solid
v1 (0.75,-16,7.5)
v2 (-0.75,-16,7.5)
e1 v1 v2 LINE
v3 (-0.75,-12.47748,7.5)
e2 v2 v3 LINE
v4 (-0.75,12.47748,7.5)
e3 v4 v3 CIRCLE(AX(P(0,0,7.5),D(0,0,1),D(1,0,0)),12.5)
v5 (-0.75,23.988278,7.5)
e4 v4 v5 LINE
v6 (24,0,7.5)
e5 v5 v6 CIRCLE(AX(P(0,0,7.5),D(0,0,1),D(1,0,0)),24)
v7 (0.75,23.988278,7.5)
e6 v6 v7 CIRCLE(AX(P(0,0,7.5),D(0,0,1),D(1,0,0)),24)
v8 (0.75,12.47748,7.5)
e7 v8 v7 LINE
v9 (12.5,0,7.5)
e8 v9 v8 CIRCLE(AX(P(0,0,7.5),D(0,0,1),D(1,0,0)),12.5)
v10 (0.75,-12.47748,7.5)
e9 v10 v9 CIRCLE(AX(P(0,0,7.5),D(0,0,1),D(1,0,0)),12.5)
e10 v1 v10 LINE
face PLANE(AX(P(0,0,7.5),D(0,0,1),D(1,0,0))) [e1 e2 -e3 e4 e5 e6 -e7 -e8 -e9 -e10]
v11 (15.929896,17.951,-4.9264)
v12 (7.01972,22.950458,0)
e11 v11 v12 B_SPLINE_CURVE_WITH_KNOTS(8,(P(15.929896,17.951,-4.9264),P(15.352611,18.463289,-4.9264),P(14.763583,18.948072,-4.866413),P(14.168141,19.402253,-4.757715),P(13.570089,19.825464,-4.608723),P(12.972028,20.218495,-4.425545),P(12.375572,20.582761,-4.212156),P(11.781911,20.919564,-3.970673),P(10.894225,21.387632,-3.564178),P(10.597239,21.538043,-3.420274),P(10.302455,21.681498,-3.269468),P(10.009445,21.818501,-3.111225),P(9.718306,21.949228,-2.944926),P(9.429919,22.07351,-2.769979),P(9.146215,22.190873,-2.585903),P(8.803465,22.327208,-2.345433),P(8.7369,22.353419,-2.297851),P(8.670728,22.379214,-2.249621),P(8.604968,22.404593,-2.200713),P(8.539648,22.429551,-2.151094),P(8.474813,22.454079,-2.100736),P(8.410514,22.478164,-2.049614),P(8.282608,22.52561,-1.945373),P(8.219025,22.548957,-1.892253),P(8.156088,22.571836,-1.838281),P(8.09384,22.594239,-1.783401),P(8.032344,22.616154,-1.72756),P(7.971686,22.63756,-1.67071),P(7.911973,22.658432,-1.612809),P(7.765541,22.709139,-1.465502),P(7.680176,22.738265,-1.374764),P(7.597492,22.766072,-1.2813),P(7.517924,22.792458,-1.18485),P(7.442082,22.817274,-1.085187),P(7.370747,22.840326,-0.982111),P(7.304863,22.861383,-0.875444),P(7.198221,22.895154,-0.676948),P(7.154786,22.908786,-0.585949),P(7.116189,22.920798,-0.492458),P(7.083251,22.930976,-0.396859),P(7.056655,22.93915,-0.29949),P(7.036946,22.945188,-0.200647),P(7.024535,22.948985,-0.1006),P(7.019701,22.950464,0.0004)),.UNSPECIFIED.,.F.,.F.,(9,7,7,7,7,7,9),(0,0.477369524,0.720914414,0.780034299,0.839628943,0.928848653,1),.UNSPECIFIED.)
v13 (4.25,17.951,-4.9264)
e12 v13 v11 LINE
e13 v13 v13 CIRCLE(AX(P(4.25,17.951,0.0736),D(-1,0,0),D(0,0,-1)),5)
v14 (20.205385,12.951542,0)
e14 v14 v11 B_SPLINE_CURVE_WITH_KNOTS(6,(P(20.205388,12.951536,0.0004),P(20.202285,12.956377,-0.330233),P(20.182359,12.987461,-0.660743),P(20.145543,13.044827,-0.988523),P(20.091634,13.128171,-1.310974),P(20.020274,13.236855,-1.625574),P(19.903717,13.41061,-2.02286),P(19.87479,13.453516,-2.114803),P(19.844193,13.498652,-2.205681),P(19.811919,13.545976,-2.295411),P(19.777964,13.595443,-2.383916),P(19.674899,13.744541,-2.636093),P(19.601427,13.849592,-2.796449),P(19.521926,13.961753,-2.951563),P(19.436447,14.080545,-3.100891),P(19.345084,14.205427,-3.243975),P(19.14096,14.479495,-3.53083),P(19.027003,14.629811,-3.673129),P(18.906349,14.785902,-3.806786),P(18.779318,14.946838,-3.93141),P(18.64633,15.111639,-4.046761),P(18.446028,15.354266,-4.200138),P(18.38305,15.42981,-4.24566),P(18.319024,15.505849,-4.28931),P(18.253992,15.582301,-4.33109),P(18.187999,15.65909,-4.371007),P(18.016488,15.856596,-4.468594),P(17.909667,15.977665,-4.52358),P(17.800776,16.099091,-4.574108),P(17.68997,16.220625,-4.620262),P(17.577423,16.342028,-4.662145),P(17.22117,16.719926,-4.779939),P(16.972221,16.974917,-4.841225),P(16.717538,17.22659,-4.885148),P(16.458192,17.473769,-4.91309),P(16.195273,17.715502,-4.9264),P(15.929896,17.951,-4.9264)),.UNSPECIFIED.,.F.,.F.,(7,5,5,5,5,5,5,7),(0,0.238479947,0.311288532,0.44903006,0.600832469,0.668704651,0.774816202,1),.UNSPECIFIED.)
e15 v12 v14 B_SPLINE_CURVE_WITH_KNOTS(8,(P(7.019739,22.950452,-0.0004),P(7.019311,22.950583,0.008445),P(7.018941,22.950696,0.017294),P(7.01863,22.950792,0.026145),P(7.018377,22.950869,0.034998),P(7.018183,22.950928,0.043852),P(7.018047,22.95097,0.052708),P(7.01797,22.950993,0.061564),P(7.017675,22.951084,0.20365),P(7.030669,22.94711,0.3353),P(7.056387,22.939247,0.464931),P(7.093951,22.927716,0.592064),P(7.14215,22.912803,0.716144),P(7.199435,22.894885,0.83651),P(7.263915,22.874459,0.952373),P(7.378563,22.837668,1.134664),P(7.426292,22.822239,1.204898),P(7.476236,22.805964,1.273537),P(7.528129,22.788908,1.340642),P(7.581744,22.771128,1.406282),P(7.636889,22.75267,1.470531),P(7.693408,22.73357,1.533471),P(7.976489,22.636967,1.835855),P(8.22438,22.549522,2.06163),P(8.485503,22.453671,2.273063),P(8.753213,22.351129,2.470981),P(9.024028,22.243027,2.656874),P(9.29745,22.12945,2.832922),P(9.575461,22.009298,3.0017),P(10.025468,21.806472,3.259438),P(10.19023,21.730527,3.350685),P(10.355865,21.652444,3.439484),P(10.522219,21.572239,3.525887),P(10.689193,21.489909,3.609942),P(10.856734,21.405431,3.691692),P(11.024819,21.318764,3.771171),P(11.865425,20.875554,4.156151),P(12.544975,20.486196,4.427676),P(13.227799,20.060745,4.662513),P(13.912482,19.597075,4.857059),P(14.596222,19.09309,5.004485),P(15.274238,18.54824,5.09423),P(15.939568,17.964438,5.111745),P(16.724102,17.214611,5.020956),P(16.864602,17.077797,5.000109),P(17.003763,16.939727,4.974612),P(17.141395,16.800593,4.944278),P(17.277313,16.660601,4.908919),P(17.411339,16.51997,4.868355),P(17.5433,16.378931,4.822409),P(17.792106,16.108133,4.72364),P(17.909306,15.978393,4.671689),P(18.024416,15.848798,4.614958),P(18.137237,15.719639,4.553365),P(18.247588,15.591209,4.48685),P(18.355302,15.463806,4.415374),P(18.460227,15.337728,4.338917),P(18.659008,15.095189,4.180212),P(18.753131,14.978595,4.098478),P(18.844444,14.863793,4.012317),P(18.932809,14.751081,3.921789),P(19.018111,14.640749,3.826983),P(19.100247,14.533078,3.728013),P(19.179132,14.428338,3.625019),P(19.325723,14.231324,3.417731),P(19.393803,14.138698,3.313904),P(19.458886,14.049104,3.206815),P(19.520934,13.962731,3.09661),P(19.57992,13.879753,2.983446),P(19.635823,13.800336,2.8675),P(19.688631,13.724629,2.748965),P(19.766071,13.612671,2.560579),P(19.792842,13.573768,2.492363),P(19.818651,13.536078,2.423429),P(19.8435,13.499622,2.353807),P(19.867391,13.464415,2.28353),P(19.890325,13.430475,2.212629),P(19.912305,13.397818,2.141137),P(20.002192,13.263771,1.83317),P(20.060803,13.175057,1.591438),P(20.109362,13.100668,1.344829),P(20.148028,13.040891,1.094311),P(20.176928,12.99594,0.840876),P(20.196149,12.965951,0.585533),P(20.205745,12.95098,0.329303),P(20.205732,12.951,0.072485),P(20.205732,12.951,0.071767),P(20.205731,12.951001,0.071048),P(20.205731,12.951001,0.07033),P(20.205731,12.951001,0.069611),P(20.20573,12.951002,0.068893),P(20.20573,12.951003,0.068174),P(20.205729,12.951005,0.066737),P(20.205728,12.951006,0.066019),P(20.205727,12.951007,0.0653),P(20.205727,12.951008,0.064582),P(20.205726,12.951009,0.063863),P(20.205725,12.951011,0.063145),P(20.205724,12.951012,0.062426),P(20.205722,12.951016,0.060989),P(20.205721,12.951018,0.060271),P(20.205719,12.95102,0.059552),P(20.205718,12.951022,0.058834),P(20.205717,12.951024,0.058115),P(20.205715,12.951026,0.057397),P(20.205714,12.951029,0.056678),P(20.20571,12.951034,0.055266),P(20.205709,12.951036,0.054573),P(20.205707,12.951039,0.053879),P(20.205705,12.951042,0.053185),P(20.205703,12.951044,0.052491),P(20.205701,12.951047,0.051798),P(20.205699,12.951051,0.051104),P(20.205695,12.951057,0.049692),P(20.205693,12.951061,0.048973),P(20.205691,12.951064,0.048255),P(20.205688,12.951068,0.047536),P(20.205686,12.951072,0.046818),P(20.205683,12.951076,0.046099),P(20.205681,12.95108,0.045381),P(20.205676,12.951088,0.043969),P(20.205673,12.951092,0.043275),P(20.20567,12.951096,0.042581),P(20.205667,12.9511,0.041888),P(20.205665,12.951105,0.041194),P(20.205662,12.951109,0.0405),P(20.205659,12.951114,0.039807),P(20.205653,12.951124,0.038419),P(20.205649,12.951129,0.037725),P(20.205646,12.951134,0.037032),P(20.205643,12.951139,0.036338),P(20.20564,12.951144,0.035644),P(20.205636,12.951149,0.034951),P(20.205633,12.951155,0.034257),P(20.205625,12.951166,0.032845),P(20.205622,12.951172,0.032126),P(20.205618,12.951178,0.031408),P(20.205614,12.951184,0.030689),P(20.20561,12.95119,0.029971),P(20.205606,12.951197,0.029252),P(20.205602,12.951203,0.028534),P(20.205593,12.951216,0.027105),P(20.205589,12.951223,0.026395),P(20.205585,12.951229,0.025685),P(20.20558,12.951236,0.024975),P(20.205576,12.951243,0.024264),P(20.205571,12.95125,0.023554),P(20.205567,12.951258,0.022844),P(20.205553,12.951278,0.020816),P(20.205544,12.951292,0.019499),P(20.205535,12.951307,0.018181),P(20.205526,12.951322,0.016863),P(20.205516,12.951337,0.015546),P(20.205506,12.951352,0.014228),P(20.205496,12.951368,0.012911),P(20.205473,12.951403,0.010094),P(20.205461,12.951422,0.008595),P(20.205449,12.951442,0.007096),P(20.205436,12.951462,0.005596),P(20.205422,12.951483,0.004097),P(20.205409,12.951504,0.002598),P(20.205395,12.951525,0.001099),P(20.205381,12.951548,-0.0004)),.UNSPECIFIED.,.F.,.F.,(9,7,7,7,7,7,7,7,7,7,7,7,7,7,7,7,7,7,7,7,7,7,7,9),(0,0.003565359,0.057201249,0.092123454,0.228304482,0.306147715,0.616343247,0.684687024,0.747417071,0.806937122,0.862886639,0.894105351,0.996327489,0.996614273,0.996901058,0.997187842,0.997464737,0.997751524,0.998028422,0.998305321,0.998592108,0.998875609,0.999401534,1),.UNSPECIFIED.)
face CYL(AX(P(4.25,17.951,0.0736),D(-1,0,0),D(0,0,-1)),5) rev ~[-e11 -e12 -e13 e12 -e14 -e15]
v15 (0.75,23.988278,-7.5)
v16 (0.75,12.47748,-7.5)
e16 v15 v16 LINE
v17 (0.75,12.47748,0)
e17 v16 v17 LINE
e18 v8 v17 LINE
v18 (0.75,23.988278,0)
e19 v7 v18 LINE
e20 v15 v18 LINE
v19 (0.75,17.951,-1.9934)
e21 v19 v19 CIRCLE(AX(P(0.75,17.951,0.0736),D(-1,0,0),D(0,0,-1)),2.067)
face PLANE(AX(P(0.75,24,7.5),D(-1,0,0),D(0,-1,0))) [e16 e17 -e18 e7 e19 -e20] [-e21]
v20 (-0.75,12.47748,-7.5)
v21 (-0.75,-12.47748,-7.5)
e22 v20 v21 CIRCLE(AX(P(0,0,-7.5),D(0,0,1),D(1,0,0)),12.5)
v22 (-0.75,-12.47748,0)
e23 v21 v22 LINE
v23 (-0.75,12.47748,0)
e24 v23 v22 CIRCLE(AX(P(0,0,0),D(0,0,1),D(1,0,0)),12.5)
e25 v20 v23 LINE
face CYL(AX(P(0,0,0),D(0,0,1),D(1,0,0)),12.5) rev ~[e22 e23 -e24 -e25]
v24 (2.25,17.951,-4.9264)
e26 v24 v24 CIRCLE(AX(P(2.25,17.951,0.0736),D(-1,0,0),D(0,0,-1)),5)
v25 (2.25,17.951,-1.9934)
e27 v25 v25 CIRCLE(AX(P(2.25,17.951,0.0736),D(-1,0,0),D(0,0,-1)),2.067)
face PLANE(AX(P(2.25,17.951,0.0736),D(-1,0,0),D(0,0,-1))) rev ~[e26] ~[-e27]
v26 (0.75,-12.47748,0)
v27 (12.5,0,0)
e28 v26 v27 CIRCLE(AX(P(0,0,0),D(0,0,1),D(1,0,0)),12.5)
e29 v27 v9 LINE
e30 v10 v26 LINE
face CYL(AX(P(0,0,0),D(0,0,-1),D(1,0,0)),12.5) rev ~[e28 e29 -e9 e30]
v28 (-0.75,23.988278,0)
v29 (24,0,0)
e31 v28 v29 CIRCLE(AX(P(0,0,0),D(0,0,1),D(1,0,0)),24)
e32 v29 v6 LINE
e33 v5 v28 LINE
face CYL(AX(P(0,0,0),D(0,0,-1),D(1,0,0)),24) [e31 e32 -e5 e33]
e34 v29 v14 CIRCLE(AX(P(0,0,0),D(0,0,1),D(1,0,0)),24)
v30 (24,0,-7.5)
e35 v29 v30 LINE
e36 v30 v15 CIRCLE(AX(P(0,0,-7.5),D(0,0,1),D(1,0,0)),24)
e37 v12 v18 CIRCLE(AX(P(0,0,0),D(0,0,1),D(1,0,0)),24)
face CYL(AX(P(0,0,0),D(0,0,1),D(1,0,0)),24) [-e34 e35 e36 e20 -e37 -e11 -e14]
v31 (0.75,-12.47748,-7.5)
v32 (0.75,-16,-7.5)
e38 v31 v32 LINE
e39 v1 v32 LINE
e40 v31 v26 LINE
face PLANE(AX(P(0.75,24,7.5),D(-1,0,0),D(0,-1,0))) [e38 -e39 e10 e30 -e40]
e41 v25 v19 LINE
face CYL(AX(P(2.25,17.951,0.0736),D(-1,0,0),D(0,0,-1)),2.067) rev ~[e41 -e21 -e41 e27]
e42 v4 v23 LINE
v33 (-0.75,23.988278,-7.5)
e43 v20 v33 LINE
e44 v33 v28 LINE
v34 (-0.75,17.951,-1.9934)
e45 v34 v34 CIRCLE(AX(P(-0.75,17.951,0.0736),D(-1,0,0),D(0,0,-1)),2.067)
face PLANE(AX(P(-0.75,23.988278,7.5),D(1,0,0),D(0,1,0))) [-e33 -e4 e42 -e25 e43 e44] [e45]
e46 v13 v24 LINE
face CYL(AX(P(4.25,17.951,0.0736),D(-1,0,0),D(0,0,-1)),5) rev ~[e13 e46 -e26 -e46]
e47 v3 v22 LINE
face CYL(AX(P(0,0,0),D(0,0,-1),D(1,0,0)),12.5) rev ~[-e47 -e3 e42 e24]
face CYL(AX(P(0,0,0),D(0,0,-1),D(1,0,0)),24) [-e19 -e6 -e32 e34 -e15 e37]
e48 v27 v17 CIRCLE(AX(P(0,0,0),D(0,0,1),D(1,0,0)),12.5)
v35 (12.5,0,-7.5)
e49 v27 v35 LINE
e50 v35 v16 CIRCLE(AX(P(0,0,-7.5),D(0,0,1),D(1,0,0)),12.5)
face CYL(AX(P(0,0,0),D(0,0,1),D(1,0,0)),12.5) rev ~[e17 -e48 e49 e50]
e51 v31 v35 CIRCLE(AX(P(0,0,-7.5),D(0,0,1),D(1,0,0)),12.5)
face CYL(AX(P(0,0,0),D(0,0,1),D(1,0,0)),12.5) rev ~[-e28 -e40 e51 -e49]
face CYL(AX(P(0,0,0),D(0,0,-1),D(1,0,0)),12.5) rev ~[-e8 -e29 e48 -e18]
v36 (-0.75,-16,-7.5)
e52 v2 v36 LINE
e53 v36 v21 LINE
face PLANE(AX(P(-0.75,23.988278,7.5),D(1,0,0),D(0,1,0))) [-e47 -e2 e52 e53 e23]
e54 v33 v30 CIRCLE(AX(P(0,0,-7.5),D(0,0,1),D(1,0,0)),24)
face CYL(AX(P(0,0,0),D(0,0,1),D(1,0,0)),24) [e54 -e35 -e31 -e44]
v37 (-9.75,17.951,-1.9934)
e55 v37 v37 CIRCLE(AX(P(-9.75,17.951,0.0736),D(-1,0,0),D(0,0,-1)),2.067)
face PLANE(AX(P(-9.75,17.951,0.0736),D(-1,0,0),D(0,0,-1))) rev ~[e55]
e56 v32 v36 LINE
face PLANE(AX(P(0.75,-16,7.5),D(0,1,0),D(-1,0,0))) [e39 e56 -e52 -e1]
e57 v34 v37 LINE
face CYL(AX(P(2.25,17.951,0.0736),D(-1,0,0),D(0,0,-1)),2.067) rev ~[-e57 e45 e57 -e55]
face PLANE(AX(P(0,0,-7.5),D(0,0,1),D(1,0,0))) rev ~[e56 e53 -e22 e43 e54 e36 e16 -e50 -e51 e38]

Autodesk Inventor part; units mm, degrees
ref_plane "YZ Plane" through (0, 0, 0) normal (1, 0, 0) x (0, 1, 0)
ref_plane "XZ Plane" through (0, 0, 0) normal (0, 1, 0) x (-1, 0, 0)
sketch "Esquisse1" plane through (0, 0, 0) normal (0, 0, 1) x (1, 0, 0)
  circle A0 centre (0, 0) radius 12.5
  circle A1 centre (0, 0) radius 24
  dimension "d0" = 25
  dimension "d1" = 48
extrude "Extrusion1" add sketch "Esquisse1" along normal mid plane 15
sketch "Esquisse2" plane through (0, 0, 7.5) normal (0, 0, 1) x (1, 0, 0)
  line L0 (-0.75, 24) -> (0.75, 24)
  line L1 (0.75, 24) -> (0.75, -16)
  line L2 (0.75, -16) -> (-0.75, -16)
  line L3 (-0.75, -16) -> (-0.75, 24)
  line L4 (-0.75, 24) -> (0.75, -16) construction
  line L5 (0.75, 24) -> (-0.75, -16) construction
  circle A0 centre (0, 0) radius 24 projected
  point P0 (0, 4)
  dimension "d4" = 1.5
  dimension "d5" = 40
extrude "Extrusion2" cut sketch "Esquisse2" against normal through all contours L0 A0 L3 | L0 L1 A0 | A0 L1 L2 L3 picked at (0, -2.6667)
ref_plane "Plan de construction1" through (4.25, 12.4775, 7.5) normal (1, 0, 0) x (0, 0, -1)
sketch "Esquisse3" plane through (4.25, 12.4775, 7.5) normal (1, 0, 0) x (0, 0, -1)
  line L0 (0, 11.5108) -> (15, 11.5108) projected
  line L1 (0, 0) -> (0, 11.5108) projected
  line L2 (15, 0) -> (0, 0) projected
  line L3 (15, 11.5108) -> (15, 0) projected
  point P0 (7.5, -12.4775)
  point P1 (7.4264, 5.4735)
hole "Perçage1" at (4.25, 17.951, 0.0736) direction (-1, 0, 0) diameter 4.134 depth 14 counterbore diameter 10 counterbore depth 2 thread size "M5x0.8" class "6H" standard "ISO Metric profile"
sketch "Esquisse4" plane through (4.25, 12.4775, 7.5) normal (1, 0, 0) x (0, 0, -1)
  circle A0 centre (7.4264, 5.4735) radius 5 projected
  point P0 (7.5, -12.4775)
extrude "Extrusion3" cut sketch "Esquisse4" along normal through all
properties part number "BagueSerrage"
